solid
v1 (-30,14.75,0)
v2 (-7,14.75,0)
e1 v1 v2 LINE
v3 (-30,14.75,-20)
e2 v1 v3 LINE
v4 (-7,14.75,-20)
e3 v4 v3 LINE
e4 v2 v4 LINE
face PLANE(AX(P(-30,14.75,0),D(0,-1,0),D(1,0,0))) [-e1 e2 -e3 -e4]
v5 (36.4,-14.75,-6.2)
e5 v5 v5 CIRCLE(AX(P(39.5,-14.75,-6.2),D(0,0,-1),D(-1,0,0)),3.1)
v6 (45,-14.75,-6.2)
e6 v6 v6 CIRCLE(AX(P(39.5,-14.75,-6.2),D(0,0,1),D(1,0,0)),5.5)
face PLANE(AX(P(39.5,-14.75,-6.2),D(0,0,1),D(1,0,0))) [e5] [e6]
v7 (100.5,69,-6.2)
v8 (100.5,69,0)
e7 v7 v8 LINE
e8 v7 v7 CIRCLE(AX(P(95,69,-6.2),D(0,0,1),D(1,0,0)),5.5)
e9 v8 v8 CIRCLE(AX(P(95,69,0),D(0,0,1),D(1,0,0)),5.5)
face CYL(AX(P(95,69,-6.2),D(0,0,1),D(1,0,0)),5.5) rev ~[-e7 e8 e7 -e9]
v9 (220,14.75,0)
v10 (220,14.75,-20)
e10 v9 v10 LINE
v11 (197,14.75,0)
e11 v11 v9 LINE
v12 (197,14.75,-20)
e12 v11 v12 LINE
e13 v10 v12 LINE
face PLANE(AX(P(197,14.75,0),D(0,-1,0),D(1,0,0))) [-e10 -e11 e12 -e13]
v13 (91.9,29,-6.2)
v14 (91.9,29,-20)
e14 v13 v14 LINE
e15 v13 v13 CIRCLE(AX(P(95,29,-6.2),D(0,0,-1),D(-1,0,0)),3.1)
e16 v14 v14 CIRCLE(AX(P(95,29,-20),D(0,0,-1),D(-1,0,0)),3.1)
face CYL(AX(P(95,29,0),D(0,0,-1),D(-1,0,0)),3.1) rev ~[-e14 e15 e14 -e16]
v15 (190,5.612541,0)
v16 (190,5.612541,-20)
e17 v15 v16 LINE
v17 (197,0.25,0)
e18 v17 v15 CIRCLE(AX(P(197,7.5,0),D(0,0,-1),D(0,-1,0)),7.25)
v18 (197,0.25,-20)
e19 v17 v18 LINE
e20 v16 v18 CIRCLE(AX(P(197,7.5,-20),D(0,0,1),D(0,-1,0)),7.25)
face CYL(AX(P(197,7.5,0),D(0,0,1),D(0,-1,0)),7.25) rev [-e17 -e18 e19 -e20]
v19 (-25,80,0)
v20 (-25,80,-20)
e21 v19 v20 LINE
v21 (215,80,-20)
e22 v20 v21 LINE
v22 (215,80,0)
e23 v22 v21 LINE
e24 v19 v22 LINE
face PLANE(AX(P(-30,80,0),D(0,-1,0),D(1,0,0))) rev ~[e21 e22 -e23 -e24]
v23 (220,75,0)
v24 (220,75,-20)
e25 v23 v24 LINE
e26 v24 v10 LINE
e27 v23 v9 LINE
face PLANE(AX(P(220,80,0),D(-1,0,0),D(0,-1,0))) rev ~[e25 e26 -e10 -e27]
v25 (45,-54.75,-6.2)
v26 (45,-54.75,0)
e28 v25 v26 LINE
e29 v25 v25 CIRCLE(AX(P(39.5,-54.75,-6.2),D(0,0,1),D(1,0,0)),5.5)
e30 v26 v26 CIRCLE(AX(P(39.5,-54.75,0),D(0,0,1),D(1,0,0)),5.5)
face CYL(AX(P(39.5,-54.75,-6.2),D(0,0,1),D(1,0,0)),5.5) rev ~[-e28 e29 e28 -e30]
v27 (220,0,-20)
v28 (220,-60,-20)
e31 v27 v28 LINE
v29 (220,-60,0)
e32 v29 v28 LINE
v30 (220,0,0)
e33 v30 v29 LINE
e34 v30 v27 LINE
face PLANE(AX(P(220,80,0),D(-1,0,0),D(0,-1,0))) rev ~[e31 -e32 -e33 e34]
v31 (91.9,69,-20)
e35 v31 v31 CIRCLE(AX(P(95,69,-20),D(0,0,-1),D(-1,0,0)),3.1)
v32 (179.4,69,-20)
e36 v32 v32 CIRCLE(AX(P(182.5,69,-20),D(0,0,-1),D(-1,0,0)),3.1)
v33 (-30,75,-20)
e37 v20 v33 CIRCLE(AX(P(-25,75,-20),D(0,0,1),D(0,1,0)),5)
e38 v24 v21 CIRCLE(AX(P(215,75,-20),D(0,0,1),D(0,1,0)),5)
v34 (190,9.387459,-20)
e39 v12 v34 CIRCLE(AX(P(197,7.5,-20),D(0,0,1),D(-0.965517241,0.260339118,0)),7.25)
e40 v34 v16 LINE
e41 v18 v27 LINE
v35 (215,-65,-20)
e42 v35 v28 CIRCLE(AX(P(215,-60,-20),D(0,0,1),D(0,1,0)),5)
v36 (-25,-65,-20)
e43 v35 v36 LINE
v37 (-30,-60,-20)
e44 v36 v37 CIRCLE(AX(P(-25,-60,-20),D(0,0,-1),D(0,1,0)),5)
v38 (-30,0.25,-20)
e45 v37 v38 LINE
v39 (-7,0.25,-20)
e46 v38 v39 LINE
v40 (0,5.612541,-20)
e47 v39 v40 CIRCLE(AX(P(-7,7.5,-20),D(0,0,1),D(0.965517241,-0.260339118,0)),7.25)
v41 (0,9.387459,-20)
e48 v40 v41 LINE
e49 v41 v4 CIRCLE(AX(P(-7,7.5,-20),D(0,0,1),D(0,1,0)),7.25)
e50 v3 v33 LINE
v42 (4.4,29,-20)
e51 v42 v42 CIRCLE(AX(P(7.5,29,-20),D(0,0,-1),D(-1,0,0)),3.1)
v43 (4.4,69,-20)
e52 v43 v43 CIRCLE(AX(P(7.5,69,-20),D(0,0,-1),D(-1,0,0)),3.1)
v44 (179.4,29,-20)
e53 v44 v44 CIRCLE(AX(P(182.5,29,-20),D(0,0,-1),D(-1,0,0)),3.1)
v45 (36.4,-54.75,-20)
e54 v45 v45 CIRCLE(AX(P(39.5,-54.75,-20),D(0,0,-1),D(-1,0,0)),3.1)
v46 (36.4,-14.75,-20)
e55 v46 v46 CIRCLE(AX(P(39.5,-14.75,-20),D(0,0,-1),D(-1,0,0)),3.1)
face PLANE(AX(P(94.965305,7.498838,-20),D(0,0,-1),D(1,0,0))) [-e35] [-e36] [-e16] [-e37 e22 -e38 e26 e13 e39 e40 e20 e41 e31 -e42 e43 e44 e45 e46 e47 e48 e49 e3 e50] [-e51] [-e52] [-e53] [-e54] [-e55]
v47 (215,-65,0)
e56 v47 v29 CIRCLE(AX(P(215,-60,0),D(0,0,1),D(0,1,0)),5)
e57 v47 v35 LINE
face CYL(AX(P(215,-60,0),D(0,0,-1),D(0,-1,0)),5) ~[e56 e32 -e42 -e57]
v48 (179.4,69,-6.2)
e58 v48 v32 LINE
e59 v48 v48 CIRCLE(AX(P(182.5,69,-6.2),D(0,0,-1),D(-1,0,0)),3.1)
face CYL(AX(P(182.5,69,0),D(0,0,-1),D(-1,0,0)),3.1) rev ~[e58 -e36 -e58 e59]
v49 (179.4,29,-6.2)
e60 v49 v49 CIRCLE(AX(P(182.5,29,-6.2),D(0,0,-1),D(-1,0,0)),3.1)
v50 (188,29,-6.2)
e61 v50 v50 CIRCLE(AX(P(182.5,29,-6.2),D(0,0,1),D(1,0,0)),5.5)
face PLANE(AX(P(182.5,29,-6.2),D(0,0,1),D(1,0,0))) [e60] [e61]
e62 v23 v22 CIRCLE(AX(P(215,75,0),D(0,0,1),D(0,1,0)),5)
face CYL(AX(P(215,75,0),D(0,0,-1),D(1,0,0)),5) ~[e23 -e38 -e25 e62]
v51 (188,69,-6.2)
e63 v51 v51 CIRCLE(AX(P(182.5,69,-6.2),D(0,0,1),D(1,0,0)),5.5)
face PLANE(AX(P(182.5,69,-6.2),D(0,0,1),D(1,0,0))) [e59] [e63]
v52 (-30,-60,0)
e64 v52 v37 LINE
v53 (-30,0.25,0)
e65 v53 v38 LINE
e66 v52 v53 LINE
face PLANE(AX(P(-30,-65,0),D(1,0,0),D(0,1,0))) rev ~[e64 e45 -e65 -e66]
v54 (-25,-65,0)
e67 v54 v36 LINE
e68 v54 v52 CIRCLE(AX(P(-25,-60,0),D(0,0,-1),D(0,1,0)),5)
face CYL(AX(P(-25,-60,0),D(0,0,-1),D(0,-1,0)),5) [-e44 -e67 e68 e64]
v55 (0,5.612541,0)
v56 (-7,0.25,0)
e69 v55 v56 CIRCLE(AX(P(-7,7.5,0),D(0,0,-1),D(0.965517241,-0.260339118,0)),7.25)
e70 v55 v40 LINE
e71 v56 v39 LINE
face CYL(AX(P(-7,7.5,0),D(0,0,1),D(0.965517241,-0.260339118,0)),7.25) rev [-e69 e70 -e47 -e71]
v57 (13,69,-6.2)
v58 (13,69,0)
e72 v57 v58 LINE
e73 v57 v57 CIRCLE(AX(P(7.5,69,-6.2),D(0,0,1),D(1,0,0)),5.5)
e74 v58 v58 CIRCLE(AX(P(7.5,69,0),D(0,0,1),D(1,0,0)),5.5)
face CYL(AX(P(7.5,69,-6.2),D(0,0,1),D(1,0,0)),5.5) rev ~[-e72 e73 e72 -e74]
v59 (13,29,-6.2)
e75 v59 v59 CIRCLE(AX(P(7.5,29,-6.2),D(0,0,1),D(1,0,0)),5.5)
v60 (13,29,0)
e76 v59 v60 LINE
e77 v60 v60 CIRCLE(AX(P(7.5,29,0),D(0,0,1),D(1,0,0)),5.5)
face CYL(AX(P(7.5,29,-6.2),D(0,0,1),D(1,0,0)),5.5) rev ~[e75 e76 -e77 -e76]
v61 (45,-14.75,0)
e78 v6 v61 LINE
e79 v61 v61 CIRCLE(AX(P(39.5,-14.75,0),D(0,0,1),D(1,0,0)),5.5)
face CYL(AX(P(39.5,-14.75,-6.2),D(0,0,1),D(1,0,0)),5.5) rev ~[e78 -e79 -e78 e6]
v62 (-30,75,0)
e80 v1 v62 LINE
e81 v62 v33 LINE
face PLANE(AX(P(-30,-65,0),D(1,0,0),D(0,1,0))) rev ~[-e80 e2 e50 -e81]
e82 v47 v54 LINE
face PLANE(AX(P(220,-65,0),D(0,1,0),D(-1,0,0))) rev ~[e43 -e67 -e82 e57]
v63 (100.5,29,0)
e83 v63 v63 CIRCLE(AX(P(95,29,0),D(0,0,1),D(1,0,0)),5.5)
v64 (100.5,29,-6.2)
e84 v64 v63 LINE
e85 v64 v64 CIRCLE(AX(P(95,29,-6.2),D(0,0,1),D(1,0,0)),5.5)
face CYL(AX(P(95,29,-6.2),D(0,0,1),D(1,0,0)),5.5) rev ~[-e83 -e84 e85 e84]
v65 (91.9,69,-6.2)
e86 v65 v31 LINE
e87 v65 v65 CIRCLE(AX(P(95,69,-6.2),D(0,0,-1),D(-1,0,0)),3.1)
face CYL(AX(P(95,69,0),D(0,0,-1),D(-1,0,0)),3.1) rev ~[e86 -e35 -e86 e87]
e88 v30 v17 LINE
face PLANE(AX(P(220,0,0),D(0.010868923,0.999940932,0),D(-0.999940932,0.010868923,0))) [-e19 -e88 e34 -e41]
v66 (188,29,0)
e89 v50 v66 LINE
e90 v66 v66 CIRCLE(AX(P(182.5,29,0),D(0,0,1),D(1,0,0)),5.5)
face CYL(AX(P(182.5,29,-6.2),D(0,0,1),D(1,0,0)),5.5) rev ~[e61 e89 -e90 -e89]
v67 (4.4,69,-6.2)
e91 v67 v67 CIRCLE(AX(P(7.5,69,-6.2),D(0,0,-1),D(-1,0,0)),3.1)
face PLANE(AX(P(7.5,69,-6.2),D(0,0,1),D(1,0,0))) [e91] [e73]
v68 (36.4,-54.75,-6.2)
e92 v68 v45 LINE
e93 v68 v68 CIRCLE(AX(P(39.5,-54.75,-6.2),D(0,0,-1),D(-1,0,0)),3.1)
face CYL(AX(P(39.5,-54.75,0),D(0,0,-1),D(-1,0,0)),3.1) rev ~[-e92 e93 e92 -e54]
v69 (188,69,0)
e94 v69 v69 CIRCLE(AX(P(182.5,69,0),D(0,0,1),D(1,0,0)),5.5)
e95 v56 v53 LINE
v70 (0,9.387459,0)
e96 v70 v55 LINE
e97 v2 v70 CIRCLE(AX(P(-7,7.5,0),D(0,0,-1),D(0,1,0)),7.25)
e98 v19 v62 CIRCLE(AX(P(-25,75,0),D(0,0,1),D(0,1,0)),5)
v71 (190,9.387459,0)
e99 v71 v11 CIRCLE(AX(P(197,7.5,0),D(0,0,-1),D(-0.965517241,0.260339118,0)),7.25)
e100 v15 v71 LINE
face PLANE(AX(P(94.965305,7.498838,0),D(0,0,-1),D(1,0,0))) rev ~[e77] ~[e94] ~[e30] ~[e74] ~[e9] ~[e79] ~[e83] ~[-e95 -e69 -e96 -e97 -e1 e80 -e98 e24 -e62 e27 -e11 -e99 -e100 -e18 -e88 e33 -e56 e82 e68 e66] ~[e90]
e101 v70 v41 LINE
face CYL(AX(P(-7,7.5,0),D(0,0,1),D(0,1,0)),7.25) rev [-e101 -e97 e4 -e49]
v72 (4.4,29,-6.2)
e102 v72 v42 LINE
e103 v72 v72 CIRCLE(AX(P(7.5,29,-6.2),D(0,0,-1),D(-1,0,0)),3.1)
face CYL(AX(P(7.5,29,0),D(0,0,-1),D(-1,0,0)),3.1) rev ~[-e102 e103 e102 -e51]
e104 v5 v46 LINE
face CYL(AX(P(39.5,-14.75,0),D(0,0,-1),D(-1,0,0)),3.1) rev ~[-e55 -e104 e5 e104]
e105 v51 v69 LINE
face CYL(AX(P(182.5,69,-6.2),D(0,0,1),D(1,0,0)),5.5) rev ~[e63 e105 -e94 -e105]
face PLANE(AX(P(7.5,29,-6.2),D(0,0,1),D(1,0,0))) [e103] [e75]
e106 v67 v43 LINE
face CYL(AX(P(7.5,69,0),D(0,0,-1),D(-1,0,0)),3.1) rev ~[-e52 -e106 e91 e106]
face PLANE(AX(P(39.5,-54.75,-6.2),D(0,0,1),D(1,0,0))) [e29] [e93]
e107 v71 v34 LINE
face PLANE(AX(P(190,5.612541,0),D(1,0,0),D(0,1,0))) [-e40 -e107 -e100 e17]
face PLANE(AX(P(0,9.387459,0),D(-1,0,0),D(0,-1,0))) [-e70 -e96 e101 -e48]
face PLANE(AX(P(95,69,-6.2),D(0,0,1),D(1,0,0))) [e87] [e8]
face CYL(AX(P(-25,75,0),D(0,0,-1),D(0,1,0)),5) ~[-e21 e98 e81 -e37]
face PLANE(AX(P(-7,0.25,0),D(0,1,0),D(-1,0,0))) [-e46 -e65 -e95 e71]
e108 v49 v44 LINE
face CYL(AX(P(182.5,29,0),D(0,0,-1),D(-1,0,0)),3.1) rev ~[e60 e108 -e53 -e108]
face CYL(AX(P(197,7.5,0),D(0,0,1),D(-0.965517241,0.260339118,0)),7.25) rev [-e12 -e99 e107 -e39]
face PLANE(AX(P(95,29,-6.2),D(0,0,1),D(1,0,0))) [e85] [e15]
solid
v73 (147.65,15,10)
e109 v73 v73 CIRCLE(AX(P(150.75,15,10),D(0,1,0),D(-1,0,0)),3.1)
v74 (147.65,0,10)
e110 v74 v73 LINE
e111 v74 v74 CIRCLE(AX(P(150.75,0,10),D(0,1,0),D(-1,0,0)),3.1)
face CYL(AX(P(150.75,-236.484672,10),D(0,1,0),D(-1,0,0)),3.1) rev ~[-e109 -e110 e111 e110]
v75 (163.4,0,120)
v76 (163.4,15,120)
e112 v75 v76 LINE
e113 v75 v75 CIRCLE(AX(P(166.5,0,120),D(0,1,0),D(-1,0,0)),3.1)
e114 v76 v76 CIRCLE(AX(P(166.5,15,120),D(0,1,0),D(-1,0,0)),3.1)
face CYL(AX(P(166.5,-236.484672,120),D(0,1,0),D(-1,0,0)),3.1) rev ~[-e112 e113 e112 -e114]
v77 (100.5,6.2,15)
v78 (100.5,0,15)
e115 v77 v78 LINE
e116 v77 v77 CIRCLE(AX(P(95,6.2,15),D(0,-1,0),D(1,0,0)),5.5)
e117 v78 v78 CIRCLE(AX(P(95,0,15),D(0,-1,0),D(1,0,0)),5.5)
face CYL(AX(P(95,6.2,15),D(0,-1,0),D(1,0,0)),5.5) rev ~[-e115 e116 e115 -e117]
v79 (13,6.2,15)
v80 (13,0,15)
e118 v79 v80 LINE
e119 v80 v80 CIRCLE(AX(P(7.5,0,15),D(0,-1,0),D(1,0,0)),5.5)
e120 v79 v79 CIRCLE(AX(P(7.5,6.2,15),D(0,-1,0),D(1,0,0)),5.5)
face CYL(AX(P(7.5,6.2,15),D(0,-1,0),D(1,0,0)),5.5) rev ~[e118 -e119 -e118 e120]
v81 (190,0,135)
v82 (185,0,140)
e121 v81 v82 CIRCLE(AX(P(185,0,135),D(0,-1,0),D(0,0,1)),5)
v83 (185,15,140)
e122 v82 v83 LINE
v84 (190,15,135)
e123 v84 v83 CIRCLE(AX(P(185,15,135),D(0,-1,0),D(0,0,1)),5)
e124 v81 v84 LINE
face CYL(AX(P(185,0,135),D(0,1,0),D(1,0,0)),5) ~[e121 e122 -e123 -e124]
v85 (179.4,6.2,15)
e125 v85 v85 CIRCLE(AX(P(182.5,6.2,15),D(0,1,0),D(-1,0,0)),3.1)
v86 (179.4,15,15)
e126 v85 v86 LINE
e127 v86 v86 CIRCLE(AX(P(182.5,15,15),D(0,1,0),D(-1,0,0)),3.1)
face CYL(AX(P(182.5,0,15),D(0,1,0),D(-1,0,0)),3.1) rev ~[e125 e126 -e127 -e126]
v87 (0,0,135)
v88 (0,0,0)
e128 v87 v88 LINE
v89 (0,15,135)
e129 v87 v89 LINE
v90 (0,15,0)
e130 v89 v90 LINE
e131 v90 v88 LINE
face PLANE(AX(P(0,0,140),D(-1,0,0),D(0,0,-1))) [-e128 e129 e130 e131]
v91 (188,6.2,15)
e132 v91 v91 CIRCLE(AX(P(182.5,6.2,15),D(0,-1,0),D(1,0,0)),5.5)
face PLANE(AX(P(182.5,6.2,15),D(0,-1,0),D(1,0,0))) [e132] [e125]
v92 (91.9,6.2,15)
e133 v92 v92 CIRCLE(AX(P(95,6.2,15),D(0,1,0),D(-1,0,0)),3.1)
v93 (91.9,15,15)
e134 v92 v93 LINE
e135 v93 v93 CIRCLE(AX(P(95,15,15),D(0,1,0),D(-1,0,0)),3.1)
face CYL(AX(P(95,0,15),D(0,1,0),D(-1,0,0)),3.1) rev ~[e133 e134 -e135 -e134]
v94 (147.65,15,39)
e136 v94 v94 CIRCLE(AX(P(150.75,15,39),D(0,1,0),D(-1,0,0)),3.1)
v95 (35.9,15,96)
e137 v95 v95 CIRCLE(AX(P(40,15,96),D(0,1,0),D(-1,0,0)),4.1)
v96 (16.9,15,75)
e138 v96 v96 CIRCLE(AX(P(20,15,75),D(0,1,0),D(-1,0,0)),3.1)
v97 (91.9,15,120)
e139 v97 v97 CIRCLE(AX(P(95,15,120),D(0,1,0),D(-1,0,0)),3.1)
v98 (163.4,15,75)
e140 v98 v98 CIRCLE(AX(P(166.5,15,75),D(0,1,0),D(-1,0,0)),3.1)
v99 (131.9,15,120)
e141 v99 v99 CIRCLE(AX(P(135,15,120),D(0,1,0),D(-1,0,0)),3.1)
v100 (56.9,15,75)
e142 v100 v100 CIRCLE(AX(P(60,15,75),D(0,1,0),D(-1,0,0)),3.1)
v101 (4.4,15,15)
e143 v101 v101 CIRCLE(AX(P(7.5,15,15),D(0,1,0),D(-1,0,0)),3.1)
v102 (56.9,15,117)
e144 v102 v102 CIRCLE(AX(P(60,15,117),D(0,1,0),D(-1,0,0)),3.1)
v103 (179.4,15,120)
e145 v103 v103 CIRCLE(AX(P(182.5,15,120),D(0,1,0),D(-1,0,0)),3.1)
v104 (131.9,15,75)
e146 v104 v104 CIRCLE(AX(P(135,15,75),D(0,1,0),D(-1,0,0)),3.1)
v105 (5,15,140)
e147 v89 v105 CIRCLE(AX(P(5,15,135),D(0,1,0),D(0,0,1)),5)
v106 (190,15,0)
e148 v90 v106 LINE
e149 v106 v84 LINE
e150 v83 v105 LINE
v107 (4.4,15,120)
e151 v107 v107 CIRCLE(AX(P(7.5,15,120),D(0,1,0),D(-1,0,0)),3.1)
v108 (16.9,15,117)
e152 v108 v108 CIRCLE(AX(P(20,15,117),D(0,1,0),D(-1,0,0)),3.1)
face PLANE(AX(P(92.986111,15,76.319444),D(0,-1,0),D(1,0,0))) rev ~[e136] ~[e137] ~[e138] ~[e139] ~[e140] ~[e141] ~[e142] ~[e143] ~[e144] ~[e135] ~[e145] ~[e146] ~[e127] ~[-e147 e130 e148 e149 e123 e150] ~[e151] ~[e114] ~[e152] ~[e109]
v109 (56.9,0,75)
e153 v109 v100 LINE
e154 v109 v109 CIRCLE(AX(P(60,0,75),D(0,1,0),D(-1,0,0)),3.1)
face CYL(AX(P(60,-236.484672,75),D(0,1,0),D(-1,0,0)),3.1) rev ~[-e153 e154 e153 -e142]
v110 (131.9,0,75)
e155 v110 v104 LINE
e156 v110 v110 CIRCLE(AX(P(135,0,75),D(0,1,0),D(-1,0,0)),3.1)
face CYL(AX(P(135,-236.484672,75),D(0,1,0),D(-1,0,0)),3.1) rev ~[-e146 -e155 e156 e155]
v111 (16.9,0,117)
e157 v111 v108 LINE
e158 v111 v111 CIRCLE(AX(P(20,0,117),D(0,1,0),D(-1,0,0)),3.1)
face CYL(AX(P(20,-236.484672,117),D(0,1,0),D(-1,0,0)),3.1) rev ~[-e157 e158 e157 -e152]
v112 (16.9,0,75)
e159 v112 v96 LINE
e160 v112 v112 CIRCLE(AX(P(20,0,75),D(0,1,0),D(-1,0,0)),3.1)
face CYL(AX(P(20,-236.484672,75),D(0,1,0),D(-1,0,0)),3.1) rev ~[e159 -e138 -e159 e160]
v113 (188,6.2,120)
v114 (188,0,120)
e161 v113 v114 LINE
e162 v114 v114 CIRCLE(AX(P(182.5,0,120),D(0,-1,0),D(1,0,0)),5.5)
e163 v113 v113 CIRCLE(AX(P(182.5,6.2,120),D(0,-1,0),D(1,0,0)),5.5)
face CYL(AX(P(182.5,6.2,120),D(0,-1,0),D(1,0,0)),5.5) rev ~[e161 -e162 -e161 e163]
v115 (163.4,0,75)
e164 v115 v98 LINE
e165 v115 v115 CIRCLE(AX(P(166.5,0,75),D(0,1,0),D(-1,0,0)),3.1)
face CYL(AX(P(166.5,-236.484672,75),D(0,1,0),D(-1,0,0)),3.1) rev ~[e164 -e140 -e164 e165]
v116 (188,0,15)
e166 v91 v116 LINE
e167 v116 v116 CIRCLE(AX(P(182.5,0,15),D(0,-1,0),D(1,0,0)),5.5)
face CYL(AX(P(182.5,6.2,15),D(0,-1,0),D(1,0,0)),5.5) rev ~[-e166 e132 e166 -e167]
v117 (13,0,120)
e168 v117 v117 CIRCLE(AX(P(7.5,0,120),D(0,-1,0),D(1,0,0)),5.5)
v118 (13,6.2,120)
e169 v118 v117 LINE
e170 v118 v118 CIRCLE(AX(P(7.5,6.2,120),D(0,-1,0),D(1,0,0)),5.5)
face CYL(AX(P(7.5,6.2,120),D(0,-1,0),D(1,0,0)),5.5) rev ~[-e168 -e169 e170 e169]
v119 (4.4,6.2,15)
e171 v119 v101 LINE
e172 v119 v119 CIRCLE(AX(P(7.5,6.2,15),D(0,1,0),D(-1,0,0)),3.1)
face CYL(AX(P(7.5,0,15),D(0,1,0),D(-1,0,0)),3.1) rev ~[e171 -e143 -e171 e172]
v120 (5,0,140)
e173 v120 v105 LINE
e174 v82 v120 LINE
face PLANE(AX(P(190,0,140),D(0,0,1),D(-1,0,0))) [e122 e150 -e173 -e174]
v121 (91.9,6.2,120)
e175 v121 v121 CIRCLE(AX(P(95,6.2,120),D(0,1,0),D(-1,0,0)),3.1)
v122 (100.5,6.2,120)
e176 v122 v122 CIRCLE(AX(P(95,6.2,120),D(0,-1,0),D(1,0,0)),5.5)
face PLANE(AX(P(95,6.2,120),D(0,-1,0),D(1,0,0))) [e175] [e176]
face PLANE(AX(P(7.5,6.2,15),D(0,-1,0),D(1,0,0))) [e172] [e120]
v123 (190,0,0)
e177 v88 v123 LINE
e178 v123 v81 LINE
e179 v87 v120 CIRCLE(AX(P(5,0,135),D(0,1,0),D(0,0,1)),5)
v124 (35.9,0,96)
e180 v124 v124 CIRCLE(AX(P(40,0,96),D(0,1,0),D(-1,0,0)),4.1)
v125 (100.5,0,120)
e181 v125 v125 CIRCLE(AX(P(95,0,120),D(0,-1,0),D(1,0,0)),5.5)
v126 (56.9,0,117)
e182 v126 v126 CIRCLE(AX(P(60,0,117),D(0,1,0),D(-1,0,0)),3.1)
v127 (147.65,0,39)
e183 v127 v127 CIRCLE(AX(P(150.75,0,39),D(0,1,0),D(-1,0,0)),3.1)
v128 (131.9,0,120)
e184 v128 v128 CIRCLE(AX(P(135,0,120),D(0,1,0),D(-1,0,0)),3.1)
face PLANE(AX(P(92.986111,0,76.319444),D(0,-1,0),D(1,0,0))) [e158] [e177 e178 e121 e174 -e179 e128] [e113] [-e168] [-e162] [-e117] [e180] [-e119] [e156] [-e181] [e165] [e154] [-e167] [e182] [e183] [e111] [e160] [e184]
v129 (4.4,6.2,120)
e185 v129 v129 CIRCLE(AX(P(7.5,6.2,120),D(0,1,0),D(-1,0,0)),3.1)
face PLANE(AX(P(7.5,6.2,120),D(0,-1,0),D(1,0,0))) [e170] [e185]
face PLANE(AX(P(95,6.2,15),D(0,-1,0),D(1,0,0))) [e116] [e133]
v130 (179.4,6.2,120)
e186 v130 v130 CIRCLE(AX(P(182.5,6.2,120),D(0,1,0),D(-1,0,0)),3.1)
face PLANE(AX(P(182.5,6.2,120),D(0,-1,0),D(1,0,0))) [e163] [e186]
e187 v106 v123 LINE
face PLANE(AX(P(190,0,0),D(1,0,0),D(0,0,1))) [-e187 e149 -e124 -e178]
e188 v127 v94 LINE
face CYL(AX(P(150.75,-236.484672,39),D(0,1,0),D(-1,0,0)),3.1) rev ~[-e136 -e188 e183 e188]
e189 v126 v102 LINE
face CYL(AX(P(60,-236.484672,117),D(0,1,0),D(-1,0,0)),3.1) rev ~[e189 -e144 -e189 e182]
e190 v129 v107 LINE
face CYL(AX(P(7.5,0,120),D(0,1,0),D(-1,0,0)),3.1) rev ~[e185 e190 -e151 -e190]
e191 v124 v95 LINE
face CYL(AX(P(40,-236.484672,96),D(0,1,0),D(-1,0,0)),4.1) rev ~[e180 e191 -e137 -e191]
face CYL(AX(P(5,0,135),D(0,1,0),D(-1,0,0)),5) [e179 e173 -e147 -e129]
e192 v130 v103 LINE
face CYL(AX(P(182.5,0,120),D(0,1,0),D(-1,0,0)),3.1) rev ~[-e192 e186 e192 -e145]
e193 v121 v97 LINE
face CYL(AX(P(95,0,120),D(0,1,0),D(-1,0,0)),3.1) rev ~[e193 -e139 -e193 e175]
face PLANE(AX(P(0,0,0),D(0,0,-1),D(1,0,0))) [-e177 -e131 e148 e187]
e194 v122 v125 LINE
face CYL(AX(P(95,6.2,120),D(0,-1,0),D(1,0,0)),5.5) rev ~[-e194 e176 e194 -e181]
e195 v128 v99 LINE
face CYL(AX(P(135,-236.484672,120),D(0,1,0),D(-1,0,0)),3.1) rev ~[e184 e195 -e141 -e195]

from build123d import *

# Parameters (mm, degrees)
F0_W            = 12.5
F0_H            = 15
F1_DEPTH        = 15
F2_D            = 6.2
F3_D            = 8.2
F4_R            = 6
F5_DEPTH        = 15
F6_DEPTH        = 25
F7_R            = 5
F7_2_R          = 5
F8_R            = 5
F10_DEPTH       = 18
F11_D           = 6.2
F11_CBORE_D     = 11
F11_CBORE_DEPTH = 6.2
F4_R_2          = 3
F13_DEPTH       = 20
F14_DEPTH       = 25
F15_D           = 6.2
F15_CBORE_D     = 11
F15_CBORE_DEPTH = 6.2
F16_R           = 5
F17_D           = 6.2


# Not quite as in the source:
# - a feature names something its author has since deleted; it is built from what else it names


with BuildPart() as f1:
    # F0 (on Front) → F1 (new body)
    with BuildSketch(Plane.XZ):
        Polygon((0, 140), (0, 0), (7.5, 0), (7.5, 15), (20, 15), (20, 75), (60, 75), (135, 75), (150.75, 75), (150.75, 39), (150.75, 10), (150.75, 0), (190, 0), (190, 140), (95, 140), align=None)
        Polygon((20, 15), (20, 0), (135, 0), (135, 75), (60, 75), (20, 75), align=None)
        Polygon((135, 75), (135, 0), (150.75, 0), (150.75, 10), (150.75, 39), (150.75, 75), align=None)
        with Locations((13.75, 7.5)):
            Rectangle(F0_W, F0_H)
    extrude(amount=-F1_DEPTH)

    # F2 (through all)
    with Locations(Plane.XZ):
        with Locations((20, 75), (135, 75), (166.5, 75), (166.5, 120), (135, 120), (20, 117), (60, 75), (60, 117)):
            Hole(F2_D / 2)

    # F3 (through all)
    with Locations(Plane.XZ):
        with Locations((40, 96)):
            Hole(F3_D / 2)

    # F4 (on face) → F6 (cut)
    with BuildSketch(Plane(origin=(0, 0, 0), x_dir=(1, 0, 0), z_dir=(0, 0, -1))):
        with BuildLine():
            Line((-7, -0.25), (-30, -0.25))
            Line((-30, -0.25), (-30, -7.5))
            Line((-30, -7.5), (-30, -14.75))
            Line((-30, -14.75), (-7, -14.75))
            ThreePointArc((-7, -14.75), (-2.5910077633, -13.2552834385), (0, -9.3874586088))
            Line((0, -9.3874586088), (0, -5.6125413912))
            ThreePointArc((0, -5.6125413912), (-2.5910077633, -1.7447165615), (-7, -0.25))
        make_face()
        with BuildLine():
            Line((220, -7.5), (220, 0))
            Line((220, 0), (197, -0.25))
            ThreePointArc((197, -0.25), (192.5910077633, -1.7447165615), (190, -5.6125413912))
            Line((190, -5.6125413912), (190, -9.3874586088))
            ThreePointArc((190, -9.3874586088), (192.5910077633, -13.2552834385), (197, -14.75))
            Line((197, -14.75), (220, -14.75))
            Line((220, -14.75), (220, -7.5))
        make_face()
        with BuildLine():
            Line((190, -9.3874586088), (190, -5.6125413912))
            ThreePointArc((190, -5.6125413912), (189.75, -7.5), (190, -9.3874586088))
        make_face()
    extrude(amount=F6_DEPTH, mode=Mode.SUBTRACT)

    # F8
    f8_edges = [f1.edges().sort_by_distance(p)[0] for p in [
        (0, 7.5, 140),
        (190, 7.5, 140),
    ]]
    fillet(f8_edges, radius=F8_R)

    # F4 (on face) → F10 (cut)
    with BuildSketch(Plane(origin=(0, 0, 0), x_dir=(1, 0, 0), z_dir=(0, 0, -1))):
        with BuildLine():
            Line((7.5, -66), (7.5, -63))
            ThreePointArc((7.5, -63), (3.2573593129, -73.2426406871), (13.5, -69))
            Line((13.5, -69), (10.5, -69))
            ThreePointArc((10.5, -69), (5.3786796564, -71.1213203436), (7.5, -66))
        make_face()
        with BuildLine():
            ThreePointArc((13.5, -69), (11.7426406871, -64.7573593129), (7.5, -63))
            Line((7.5, -63), (7.5, -66))
            ThreePointArc((7.5, -66), (9.6213203436, -66.8786796564), (10.5, -69))
            Line((10.5, -69), (13.5, -69))
        make_face()
        with BuildLine():
            ThreePointArc((13.5, -29), (11.7426406871, -24.7573593129), (7.5, -23))
            Line((7.5, -23), (7.5, -26))
            ThreePointArc((7.5, -26), (9.6213203436, -26.8786796564), (10.5, -29))
            ThreePointArc((10.5, -29), (9.6213203436, -31.1213203436), (7.5, -32))
            Line((7.5, -32), (7.5, -35))
            ThreePointArc((7.5, -35), (11.7426406871, -33.2426406871), (13.5, -29))
        make_face()
    extrude(amount=-F10_DEPTH, mode=Mode.SUBTRACT)

    # F11 (through all)
    with Locations(Plane.XZ):
        with Locations((7.5, 120), (7.5, 15), (182.5, 15), (182.5, 120), (95, 120), (95, 15)):
            CounterBoreHole(F11_D / 2, F11_CBORE_D / 2, F11_CBORE_DEPTH)

    # F17 (through all)
    with Locations(Plane.XZ):
        with Locations((150.75, 10), (150.75, 39)):
            Hole(F17_D / 2)


with BuildPart() as f5:
    # F4 (on face) → F5 (new body)
    with BuildSketch(Plane(origin=(0, 0, 0), x_dir=(1, 0, 0), z_dir=(0, 0, -1))):
        with BuildLine():
            Line((190, -15), (182.5, -15))
            Line((182.5, -15), (39.5, -15))
            Line((39.5, -15), (7.5, -15))
            Line((7.5, -15), (0, -15))
            Line((0, -15), (0, -9.3874586088))
            ThreePointArc((0, -9.3874586088), (-2.5910077633, -13.2552834385), (-7, -14.75))
            Line((-7, -14.75), (-30, -14.75))
            Line((-30, -14.75), (-30, -80))
            Line((-30, -80), (95, -80))
            Line((95, -80), (220, -80))
            Line((220, -80), (220, -14.75))
            Line((220, -14.75), (197, -14.75))
            ThreePointArc((197, -14.75), (192.5910077633, -13.2552834385), (190, -9.3874586088))
            Line((190, -9.3874586088), (190, -15))
        make_face()
        with BuildLine():
            ThreePointArc((13.5, -69), (3.2573593129, -73.2426406871), (7.5, -63))
            ThreePointArc((7.5, -63), (11.7426406871, -64.7573593129), (13.5, -69))
        make_face(mode=Mode.SUBTRACT)
        with BuildLine():
            ThreePointArc((7.5, -35), (1.5, -29), (7.5, -23))
            ThreePointArc((7.5, -23), (11.7426406871, -24.7573593129), (13.5, -29))
            ThreePointArc((13.5, -29), (11.7426406871, -33.2426406871), (7.5, -35))
        make_face(mode=Mode.SUBTRACT)
        with BuildLine():
            ThreePointArc((188.5, -69), (182.5, -75), (176.5, -69))
            ThreePointArc((176.5, -69), (182.5, -63), (188.5, -69))
        make_face(mode=Mode.SUBTRACT)
        with Locations((182.5, -29)):
            Circle(F4_R, mode=Mode.SUBTRACT)
        with BuildLine():
            ThreePointArc((188.5, -69), (182.5, -63), (176.5, -69))
            ThreePointArc((176.5, -69), (182.5, -75), (188.5, -69))
        make_face()
        with BuildLine():
            ThreePointArc((185.5, -69), (182.5, -72), (179.5, -69))
            ThreePointArc((179.5, -69), (182.5, -66), (185.5, -69))
        make_face(mode=Mode.SUBTRACT)
        with BuildLine():
            Line((7.5, -66), (7.5, -63))
            ThreePointArc((7.5, -63), (3.2573593129, -73.2426406871), (13.5, -69))
            Line((13.5, -69), (10.5, -69))
            ThreePointArc((10.5, -69), (5.3786796564, -71.1213203436), (7.5, -66))
        make_face()
        with BuildLine():
            ThreePointArc((13.5, -29), (11.7426406871, -24.7573593129), (7.5, -23))
            Line((7.5, -23), (7.5, -26))
            ThreePointArc((7.5, -26), (9.6213203436, -26.8786796564), (10.5, -29))
            ThreePointArc((10.5, -29), (9.6213203436, -31.1213203436), (7.5, -32))
            Line((7.5, -32), (7.5, -35))
            ThreePointArc((7.5, -35), (11.7426406871, -33.2426406871), (13.5, -29))
        make_face()
        with BuildLine():
            ThreePointArc((13.5, -69), (11.7426406871, -64.7573593129), (7.5, -63))
            Line((7.5, -63), (7.5, -66))
            ThreePointArc((7.5, -66), (9.6213203436, -66.8786796564), (10.5, -69))
            Line((10.5, -69), (13.5, -69))
        make_face()
    extrude(amount=F5_DEPTH)

    # F7
    f7_edges = [f5.edges().sort_by_distance(p)[0] for p in [
        (-30, 80, -7.5),
        (220, 80, -7.5),
    ]]
    fillet(f7_edges, radius=F7_R)


with BuildPart() as f5b:
    # F4 (on face) → F5, piece 2 (new body)
    with BuildSketch(Plane(origin=(0, 0, 0), x_dir=(1, 0, 0), z_dir=(0, 0, -1))):
        with BuildLine():
            Line((39.5, 0), (95, 0))
            Line((95, 0), (95, 65))
            Line((95, 65), (-30, 65))
            Line((-30, 65), (-30, -0.25))
            Line((-30, -0.25), (-7, -0.25))
            ThreePointArc((-7, -0.25), (-2.5910077633, -1.7447165615), (0, -5.6125413912))
            Line((0, -5.6125413912), (0, 0))
            Line((0, 0), (7.5, 0))
            Line((7.5, 0), (39.5, 0))
        make_face()
        with BuildLine():
            Line((95, 65), (95, 0))
            Line((95, 0), (182.5, 0))
            Line((182.5, 0), (190, 0))
            Line((190, 0), (190, -5.6125413912))
            ThreePointArc((190, -5.6125413912), (192.5910077633, -1.7447165615), (197, -0.25))
            Line((197, -0.25), (220, 0))
            Line((220, 0), (220, 65))
            Line((220, 65), (95, 65))
        make_face()
    extrude(amount=F5_DEPTH)

    # F7#2
    f7_2_edges = [f5b.edges().sort_by_distance(p)[0] for p in [
        (-30, -65, -7.5),
        (220, -65, -7.5),
    ]]
    fillet(f7_2_edges, radius=F7_2_R)


with BuildPart() as f13:
    # F4 (on face) → F13 (new body)
    with BuildSketch(Plane(origin=(0, 0, 0), x_dir=(1, 0, 0), z_dir=(0, 0, -1))):
        with BuildLine():
            Line((220, 65), (95, 65))
            Line((95, 65), (-30, 65))
            Line((-30, 65), (-30, -0.25))
            Line((-30, -0.25), (-7, -0.25))
            ThreePointArc((-7, -0.25), (0.25, -7.5), (-7, -14.75))
            Line((-7, -14.75), (-30, -14.75))
            Line((-30, -14.75), (-30, -80))
            Line((-30, -80), (95, -80))
            Line((95, -80), (220, -80))
            Line((220, -80), (220, -14.75))
            Line((220, -14.75), (197, -14.75))
            ThreePointArc((197, -14.75), (189.75, -7.5), (197, -0.25))
            Line((197, -0.25), (220, 0))
            Line((220, 0), (220, 65))
        make_face()
        with BuildLine():
            ThreePointArc((13.5, -69), (3.2573593129, -73.2426406871), (7.5, -63))
            ThreePointArc((7.5, -63), (11.7426406871, -64.7573593129), (13.5, -69))
        make_face(mode=Mode.SUBTRACT)
        with BuildLine():
            ThreePointArc((13.5, -29), (11.7426406871, -33.2426406871), (7.5, -35))
            ThreePointArc((7.5, -35), (1.5, -29), (7.5, -23))
            ThreePointArc((7.5, -23), (11.7426406871, -24.7573593129), (13.5, -29))
        make_face(mode=Mode.SUBTRACT)
        with BuildLine():
            ThreePointArc((188.5, -69), (182.5, -75), (176.5, -69))
            ThreePointArc((176.5, -69), (182.5, -63), (188.5, -69))
        make_face(mode=Mode.SUBTRACT)
        with Locations((182.5, -29)):
            Circle(F4_R, mode=Mode.SUBTRACT)
        with BuildLine():
            Line((-7, -0.25), (-30, -0.25))
            Line((-30, -0.25), (-30, -7.5))
            Line((-30, -7.5), (-30, -14.75))
            Line((-30, -14.75), (-7, -14.75))
            ThreePointArc((-7, -14.75), (0.25, -7.5), (-7, -0.25))
        make_face()
        with BuildLine():
            Line((220, -7.5), (220, 0))
            Line((220, 0), (197, -0.25))
            ThreePointArc((197, -0.25), (189.75, -7.5), (197, -14.75))
            Line((197, -14.75), (220, -14.75))
            Line((220, -14.75), (220, -7.5))
        make_face()
        with BuildLine():
            Line((7.5, -66), (7.5, -63))
            ThreePointArc((7.5, -63), (3.2573593129, -73.2426406871), (13.5, -69))
            Line((13.5, -69), (10.5, -69))
            ThreePointArc((10.5, -69), (5.3786796564, -71.1213203436), (7.5, -66))
        make_face()
        with BuildLine():
            Line((7.5, -69), (7.5, -66))
            ThreePointArc((7.5, -66), (5.3786796564, -71.1213203436), (10.5, -69))
            Line((10.5, -69), (7.5, -69))
        make_face()
        with BuildLine():
            ThreePointArc((188.5, -69), (182.5, -63), (176.5, -69))
            ThreePointArc((176.5, -69), (182.5, -75), (188.5, -69))
        make_face()
        with BuildLine():
            ThreePointArc((185.5, -69), (182.5, -72), (179.5, -69))
            ThreePointArc((179.5, -69), (182.5, -66), (185.5, -69))
        make_face(mode=Mode.SUBTRACT)
        with BuildLine():
            ThreePointArc((185.5, -69), (182.5, -66), (179.5, -69))
            ThreePointArc((179.5, -69), (182.5, -72), (185.5, -69))
        make_face()
        with BuildLine():
            ThreePointArc((13.5, -29), (11.7426406871, -24.7573593129), (7.5, -23))
            Line((7.5, -23), (7.5, -26))
            ThreePointArc((7.5, -26), (9.6213203436, -26.8786796564), (10.5, -29))
            ThreePointArc((10.5, -29), (9.6213203436, -31.1213203436), (7.5, -32))
            Line((7.5, -32), (7.5, -35))
            ThreePointArc((7.5, -35), (11.7426406871, -33.2426406871), (13.5, -29))
        make_face()
        with BuildLine():
            ThreePointArc((13.5, -69), (11.7426406871, -64.7573593129), (7.5, -63))
            Line((7.5, -63), (7.5, -66))
            ThreePointArc((7.5, -66), (9.6213203436, -66.8786796564), (10.5, -69))
            Line((10.5, -69), (13.5, -69))
        make_face()
        with BuildLine():
            ThreePointArc((10.5, -69), (9.6213203436, -66.8786796564), (7.5, -66))
            Line((7.5, -66), (7.5, -69))
            Line((7.5, -69), (10.5, -69))
        make_face()
        with BuildLine():
            Line((7.5, -26), (7.5, -23))
            ThreePointArc((7.5, -23), (1.5, -29), (7.5, -35))
            Line((7.5, -35), (7.5, -32))
            ThreePointArc((7.5, -32), (4.5, -29), (7.5, -26))
        make_face()
        with Locations((182.5, -29)):
            Circle(F4_R)
        with Locations((182.5, -29)):
            Circle(F4_R_2, mode=Mode.SUBTRACT)
        with BuildLine():
            Line((7.5, -29), (7.5, -26))
            ThreePointArc((7.5, -26), (4.5, -29), (7.5, -32))
            Line((7.5, -32), (7.5, -29))
        make_face()
        with BuildLine():
            ThreePointArc((10.5, -29), (9.6213203436, -26.8786796564), (7.5, -26))
            Line((7.5, -26), (7.5, -29))
            Line((7.5, -29), (7.5, -32))
            ThreePointArc((7.5, -32), (9.6213203436, -31.1213203436), (10.5, -29))
        make_face()
    extrude(amount=F13_DEPTH)

    # F4 (on face) → F14 (cut)
    with BuildSketch(Plane(origin=(0, 0, 0), x_dir=(1, 0, 0), z_dir=(0, 0, -1))):
        with BuildLine():
            Line((-7, -0.25), (-30, -0.25))
            Line((-30, -0.25), (-30, -7.5))
            Line((-30, -7.5), (-30, -14.75))
            Line((-30, -14.75), (-7, -14.75))
            ThreePointArc((-7, -14.75), (-2.5910077633, -13.2552834385), (0, -9.3874586088))
            Line((0, -9.3874586088), (0, -5.6125413912))
            ThreePointArc((0, -5.6125413912), (-2.5910077633, -1.7447165615), (-7, -0.25))
        make_face()
        with BuildLine():
            Line((220, -7.5), (220, 0))
            Line((220, 0), (197, -0.25))
            ThreePointArc((197, -0.25), (192.5910077633, -1.7447165615), (190, -5.6125413912))
            Line((190, -5.6125413912), (190, -9.3874586088))
            ThreePointArc((190, -9.3874586088), (192.5910077633, -13.2552834385), (197, -14.75))
            Line((197, -14.75), (220, -14.75))
            Line((220, -14.75), (220, -7.5))
        make_face()
    extrude(amount=F14_DEPTH, mode=Mode.SUBTRACT)

    # F15 (through all)
    with Locations(Plane.XY):
        with Locations((7.5, 69), (7.5, 29), (182.5, 29), (182.5, 69), (95, 69), (95, 29), (39.5, -14.75), (39.5, -54.75)):
            CounterBoreHole(F15_D / 2, F15_CBORE_D / 2, F15_CBORE_DEPTH)

    # F16
    f16_edges = [f13.edges().sort_by_distance(p)[0] for p in [
        (220, -65, -10),
        (220, 80, -10),
        (-30, -65, -10),
        (-30, 80, -10),
    ]]
    fillet(f16_edges, radius=F16_R)


solid = Compound([f1.part, f13.part])
